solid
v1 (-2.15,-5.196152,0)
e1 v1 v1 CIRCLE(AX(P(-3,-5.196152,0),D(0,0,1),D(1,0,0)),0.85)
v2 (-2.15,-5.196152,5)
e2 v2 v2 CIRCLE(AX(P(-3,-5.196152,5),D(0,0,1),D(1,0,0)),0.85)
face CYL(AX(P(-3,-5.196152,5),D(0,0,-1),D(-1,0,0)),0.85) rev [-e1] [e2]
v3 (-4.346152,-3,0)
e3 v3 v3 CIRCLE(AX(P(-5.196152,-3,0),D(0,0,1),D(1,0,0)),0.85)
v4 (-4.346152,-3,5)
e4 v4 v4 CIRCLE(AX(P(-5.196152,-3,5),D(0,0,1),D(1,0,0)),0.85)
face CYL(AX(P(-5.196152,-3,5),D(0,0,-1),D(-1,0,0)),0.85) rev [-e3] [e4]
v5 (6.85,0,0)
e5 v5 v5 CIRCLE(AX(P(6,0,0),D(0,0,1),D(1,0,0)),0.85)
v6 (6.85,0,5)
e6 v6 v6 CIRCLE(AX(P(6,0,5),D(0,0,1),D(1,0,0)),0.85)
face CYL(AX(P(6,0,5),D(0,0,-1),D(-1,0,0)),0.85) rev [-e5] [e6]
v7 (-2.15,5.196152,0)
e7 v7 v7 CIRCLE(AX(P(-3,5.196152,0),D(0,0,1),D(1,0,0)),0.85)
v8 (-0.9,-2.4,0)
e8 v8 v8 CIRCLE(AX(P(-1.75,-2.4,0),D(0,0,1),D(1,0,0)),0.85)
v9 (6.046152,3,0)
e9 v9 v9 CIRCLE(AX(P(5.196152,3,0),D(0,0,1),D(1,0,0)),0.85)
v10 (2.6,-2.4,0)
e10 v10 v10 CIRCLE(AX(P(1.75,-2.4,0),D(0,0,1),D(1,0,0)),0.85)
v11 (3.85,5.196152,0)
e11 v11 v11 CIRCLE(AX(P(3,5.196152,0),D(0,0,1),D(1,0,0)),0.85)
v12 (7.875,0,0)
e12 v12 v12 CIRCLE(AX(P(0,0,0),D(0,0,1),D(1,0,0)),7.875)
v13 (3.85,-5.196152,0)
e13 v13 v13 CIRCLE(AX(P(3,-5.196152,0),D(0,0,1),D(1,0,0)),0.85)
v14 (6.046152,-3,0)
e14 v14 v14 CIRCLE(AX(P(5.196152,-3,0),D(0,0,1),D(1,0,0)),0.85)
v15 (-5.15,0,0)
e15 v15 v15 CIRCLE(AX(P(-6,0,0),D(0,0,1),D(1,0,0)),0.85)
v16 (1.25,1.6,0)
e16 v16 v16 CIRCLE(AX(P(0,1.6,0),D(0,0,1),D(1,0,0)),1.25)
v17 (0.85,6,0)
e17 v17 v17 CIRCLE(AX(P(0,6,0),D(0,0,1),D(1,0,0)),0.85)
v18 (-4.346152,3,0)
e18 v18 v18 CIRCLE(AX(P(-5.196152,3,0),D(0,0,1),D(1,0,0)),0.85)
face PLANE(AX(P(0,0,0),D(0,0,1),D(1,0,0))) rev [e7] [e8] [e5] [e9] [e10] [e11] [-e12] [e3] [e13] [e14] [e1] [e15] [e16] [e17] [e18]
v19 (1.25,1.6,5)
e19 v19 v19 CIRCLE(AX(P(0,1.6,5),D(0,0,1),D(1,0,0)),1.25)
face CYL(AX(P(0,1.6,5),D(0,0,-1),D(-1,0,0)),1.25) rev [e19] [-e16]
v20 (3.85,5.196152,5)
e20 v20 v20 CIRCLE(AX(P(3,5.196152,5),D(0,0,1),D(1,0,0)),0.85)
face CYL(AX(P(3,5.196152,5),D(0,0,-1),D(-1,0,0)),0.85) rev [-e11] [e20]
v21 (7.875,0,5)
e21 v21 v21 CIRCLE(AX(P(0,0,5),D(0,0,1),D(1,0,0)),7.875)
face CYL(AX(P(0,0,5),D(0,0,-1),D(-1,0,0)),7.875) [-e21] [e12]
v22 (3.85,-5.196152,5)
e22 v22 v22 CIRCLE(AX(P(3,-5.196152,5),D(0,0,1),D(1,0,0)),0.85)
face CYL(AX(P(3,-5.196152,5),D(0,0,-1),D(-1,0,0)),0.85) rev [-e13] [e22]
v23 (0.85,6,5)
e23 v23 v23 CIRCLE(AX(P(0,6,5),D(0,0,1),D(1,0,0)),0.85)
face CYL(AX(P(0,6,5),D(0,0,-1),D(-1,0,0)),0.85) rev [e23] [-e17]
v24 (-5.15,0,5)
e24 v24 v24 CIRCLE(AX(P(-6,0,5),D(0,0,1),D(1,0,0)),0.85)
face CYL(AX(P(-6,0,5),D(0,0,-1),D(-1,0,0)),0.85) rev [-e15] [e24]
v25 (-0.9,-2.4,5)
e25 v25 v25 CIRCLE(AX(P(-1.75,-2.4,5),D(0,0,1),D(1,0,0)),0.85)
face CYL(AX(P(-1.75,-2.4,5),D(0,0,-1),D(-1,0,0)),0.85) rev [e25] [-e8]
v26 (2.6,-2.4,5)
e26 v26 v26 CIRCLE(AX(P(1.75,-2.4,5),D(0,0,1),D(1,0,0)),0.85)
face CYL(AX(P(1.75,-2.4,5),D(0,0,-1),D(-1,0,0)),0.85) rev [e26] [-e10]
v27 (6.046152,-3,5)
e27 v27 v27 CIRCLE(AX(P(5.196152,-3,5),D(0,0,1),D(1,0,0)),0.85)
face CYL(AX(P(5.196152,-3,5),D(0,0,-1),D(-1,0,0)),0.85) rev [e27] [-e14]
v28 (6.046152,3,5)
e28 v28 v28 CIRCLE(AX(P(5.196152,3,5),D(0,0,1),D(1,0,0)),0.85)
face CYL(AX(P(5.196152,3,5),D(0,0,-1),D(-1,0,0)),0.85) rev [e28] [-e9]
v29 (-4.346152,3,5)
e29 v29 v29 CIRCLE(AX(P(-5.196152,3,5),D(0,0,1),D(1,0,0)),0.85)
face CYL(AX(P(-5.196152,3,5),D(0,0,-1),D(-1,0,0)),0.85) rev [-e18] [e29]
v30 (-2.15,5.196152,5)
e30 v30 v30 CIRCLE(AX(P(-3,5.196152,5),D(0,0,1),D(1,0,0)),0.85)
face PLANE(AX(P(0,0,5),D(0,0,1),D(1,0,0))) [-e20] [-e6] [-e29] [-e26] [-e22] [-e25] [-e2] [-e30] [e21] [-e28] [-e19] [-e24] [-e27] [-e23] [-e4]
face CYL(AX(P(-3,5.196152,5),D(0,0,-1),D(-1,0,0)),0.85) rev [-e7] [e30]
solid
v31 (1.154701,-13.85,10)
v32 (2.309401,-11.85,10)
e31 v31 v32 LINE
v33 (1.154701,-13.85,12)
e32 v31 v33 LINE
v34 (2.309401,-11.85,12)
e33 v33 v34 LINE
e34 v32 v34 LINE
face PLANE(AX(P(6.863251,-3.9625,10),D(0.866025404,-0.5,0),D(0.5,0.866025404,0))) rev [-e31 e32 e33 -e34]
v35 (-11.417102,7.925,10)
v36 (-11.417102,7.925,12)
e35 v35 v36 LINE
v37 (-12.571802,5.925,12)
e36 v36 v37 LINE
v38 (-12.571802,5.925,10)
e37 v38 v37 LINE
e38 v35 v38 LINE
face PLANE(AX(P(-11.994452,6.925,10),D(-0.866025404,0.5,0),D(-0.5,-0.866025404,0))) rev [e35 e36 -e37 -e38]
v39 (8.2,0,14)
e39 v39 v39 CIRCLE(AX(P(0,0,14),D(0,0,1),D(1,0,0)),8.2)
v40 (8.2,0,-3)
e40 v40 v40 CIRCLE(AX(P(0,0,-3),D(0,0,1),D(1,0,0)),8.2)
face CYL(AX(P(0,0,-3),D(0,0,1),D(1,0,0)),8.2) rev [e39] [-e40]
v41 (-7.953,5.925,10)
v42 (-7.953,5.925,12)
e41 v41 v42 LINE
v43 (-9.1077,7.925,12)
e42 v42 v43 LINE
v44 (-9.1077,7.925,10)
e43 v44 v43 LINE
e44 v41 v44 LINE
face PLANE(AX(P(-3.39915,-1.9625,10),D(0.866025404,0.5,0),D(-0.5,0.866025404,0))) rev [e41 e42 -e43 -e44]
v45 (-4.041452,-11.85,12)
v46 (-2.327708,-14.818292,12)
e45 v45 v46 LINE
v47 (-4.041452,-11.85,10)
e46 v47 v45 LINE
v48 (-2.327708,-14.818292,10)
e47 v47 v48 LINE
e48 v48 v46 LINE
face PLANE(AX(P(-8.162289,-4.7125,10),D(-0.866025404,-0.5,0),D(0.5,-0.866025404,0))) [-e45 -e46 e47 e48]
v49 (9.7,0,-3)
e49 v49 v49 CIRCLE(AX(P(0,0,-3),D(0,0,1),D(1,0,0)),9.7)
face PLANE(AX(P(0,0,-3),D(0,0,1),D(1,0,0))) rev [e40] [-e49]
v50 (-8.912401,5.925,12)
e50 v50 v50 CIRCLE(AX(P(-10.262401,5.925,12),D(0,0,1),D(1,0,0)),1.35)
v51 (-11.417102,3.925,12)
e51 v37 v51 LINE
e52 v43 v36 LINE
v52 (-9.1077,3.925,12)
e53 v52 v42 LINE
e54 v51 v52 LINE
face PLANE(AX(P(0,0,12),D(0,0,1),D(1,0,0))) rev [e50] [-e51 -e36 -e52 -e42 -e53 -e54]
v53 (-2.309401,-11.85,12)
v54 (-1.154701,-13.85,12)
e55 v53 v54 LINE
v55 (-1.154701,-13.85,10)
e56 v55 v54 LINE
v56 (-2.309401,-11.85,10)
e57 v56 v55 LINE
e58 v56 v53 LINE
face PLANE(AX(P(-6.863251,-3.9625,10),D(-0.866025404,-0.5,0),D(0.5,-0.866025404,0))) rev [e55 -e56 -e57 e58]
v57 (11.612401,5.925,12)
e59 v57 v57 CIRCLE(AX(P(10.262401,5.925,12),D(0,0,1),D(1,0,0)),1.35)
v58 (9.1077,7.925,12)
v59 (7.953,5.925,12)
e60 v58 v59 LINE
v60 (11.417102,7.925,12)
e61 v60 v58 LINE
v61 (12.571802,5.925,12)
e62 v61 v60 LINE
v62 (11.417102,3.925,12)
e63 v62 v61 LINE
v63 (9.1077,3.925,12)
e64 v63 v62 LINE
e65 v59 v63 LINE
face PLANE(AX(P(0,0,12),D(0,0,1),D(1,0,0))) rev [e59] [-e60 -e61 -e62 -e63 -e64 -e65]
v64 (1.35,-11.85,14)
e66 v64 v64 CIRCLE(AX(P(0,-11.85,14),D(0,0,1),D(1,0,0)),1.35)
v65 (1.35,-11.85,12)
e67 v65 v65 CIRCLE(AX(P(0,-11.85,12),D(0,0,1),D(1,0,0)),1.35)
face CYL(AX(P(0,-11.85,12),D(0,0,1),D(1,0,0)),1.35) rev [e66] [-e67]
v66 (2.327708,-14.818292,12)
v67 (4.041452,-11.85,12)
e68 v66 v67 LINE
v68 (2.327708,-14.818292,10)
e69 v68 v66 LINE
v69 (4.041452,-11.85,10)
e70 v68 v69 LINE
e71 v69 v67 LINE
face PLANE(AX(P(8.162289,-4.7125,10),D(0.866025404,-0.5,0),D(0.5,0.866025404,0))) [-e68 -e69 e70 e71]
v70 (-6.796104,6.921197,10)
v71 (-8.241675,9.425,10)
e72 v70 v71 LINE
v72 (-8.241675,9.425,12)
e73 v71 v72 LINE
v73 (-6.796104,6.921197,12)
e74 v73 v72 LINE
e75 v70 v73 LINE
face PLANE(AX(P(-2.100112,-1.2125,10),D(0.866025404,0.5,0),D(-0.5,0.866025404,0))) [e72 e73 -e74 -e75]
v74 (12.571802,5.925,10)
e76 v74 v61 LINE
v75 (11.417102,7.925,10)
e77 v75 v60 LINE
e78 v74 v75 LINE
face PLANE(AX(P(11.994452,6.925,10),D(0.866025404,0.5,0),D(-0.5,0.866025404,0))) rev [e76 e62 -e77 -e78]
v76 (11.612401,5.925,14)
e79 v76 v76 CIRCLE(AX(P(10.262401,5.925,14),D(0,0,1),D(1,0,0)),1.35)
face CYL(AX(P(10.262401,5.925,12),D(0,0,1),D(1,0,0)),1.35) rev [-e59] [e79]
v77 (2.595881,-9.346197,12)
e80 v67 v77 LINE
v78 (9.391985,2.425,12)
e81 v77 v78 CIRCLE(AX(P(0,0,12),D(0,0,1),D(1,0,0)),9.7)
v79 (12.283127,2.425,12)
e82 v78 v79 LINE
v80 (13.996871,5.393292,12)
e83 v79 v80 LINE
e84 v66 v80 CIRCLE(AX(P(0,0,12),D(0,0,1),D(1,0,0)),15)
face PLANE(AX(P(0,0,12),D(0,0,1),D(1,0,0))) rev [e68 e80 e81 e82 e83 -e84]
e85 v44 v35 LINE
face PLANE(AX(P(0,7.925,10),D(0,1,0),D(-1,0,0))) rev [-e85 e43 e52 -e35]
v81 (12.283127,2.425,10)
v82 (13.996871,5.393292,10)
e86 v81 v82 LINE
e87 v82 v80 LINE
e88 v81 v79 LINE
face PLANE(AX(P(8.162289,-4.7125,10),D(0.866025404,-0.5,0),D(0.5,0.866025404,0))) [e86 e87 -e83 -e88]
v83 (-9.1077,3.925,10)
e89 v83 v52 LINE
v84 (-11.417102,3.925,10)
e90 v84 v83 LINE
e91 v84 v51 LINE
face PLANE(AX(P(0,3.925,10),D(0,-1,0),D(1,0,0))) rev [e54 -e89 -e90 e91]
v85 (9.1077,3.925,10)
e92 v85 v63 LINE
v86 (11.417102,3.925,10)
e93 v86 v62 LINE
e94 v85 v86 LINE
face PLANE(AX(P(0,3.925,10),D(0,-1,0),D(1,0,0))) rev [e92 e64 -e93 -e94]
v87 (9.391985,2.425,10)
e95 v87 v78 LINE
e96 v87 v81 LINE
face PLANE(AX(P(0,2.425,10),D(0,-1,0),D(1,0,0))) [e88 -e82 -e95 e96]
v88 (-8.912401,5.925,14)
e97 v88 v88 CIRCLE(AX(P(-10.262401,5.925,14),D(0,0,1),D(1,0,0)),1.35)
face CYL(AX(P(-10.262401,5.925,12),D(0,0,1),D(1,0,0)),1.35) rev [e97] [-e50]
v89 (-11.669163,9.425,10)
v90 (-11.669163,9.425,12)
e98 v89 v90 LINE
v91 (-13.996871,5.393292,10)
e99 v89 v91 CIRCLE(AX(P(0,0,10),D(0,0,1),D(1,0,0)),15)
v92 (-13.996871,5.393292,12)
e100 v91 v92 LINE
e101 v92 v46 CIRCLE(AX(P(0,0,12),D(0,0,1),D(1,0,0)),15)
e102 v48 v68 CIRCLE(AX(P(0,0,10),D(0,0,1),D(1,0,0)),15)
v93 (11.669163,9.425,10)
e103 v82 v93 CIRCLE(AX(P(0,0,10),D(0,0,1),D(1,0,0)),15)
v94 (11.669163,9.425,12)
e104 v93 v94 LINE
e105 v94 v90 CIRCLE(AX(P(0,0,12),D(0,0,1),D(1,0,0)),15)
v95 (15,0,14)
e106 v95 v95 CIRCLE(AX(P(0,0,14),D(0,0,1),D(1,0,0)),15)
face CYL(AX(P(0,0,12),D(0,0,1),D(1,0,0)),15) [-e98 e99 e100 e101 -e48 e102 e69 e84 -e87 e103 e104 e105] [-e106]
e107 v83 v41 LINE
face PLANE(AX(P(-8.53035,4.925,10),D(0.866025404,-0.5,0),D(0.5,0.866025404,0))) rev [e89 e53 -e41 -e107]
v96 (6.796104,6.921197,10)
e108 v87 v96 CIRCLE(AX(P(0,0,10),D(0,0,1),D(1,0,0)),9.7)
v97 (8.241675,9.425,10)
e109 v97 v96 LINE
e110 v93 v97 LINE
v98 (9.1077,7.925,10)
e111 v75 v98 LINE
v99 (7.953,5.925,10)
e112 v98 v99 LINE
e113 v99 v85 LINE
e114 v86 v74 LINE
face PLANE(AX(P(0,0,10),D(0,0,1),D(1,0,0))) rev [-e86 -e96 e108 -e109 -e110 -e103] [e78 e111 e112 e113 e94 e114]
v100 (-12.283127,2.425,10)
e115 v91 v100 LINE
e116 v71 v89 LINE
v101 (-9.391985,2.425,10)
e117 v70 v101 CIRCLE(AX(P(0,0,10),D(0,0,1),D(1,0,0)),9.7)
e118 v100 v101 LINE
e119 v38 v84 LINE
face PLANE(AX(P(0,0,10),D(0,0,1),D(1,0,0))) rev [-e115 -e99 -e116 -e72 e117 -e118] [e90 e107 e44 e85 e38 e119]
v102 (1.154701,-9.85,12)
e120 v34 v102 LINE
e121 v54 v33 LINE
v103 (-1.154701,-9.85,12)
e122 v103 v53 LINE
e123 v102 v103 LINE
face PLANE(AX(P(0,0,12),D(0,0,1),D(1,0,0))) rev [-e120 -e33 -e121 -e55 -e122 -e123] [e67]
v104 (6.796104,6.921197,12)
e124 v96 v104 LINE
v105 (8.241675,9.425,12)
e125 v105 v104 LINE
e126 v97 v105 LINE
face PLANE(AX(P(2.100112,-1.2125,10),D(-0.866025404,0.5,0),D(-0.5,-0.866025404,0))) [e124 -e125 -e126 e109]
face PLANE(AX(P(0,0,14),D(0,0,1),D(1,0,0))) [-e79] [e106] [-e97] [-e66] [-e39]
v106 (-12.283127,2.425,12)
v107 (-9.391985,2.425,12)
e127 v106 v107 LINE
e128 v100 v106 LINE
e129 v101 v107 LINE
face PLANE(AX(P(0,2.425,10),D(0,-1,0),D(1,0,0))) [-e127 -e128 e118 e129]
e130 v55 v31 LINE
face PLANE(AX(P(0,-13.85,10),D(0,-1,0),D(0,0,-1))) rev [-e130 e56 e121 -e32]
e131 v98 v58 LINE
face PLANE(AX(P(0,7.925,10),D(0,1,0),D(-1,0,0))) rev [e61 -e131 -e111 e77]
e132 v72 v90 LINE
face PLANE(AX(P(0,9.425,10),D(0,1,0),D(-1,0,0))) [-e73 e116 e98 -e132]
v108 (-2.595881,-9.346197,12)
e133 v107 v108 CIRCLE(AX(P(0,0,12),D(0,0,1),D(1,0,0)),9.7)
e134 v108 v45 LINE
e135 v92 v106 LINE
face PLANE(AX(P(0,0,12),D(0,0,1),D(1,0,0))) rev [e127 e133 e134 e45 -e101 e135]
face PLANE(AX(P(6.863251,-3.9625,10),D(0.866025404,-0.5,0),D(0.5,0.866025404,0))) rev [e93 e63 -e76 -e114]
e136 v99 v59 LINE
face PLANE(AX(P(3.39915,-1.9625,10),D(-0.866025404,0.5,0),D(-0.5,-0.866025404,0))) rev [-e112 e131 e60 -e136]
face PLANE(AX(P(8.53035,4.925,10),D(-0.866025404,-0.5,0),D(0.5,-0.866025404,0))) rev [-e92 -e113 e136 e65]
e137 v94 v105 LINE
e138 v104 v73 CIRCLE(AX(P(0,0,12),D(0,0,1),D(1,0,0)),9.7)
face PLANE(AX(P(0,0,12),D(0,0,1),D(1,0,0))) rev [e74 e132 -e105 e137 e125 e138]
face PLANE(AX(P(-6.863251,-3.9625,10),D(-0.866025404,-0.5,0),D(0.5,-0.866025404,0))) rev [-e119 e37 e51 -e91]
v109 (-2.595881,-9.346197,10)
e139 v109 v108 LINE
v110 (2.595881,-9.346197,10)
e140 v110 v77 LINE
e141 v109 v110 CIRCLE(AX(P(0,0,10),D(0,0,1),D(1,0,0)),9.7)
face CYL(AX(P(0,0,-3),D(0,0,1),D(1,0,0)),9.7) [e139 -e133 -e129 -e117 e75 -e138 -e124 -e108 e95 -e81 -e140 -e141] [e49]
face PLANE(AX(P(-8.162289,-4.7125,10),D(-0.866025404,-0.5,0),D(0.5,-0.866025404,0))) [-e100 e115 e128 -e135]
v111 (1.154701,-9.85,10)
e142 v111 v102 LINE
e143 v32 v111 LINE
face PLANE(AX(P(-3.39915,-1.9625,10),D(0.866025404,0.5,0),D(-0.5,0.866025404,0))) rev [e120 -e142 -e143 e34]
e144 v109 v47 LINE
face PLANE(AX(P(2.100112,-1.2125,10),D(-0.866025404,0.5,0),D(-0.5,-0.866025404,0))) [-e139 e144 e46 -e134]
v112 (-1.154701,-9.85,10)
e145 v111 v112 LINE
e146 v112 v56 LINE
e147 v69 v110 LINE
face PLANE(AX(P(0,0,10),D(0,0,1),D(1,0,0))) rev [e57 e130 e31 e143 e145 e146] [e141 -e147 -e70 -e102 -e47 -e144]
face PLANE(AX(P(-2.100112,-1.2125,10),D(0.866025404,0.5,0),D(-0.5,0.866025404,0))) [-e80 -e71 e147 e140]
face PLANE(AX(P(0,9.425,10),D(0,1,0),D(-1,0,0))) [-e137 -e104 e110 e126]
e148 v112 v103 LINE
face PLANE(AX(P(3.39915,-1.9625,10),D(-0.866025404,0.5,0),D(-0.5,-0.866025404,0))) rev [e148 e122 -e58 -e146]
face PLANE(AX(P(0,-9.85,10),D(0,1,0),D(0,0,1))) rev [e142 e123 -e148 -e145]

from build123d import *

# Parameters (mm, degrees)
SKETCH1_R                 = 7.875
SKETCH1_R_2               = 0.85
SKETCH1_R_3               = 1.25
BOSS_EXTRUDE1_DEPTH       = 5
EXTRUDE_THIN1_START       = -3
EXTRUDE_THIN1_OUTLINE_R   = 9.7
EXTRUDE_THIN1_OUTLINE_R_2 = 8.2
EXTRUDE_THIN1_DEPTH       = 17
SKETCH4_R                 = 15
SKETCH4_R_2               = 9.7
SKETCH4_R_3               = 1.35
BOSS_EXTRUDE2_DEPTH       = 2
BOSS_EXTRUDE3_START       = -2
BOSS_EXTRUDE3_DEPTH       = 2
CIRPATTERN1_COUNT         = 3
SKETCH4_5_R               = 1.35
CUT_EXTRUDE1_DEPTH        = 2


# Read off the part's stored shape, not the designer's step: Extrude-Thin1
with BuildPart() as part:
    # Sketch1 → Boss-Extrude1 (new body)
    with BuildSketch(Plane.XY):
        Circle(SKETCH1_R)
        with Locations((0, 6)):
            Circle(SKETCH1_R_2, mode=Mode.SUBTRACT)
        with Locations((3, 5.196152423)):
            Circle(SKETCH1_R_2, mode=Mode.SUBTRACT)
        with Locations((5.196152423, 3)):
            Circle(SKETCH1_R_2, mode=Mode.SUBTRACT)
        with Locations((6, 0)):
            Circle(SKETCH1_R_2, mode=Mode.SUBTRACT)
        with Locations((5.196152423, -3)):
            Circle(SKETCH1_R_2, mode=Mode.SUBTRACT)
        with Locations((3, -5.196152423)):
            Circle(SKETCH1_R_2, mode=Mode.SUBTRACT)
        with Locations((-3, -5.196152423)):
            Circle(SKETCH1_R_2, mode=Mode.SUBTRACT)
        with Locations((-5.196152423, -3)):
            Circle(SKETCH1_R_2, mode=Mode.SUBTRACT)
        with Locations((-6, 0)):
            Circle(SKETCH1_R_2, mode=Mode.SUBTRACT)
        with Locations((-5.196152423, 3)):
            Circle(SKETCH1_R_2, mode=Mode.SUBTRACT)
        with Locations((-3, 5.196152423)):
            Circle(SKETCH1_R_2, mode=Mode.SUBTRACT)
        with Locations((1.75, -2.4)):
            Circle(SKETCH1_R_2, mode=Mode.SUBTRACT)
        with Locations((-1.75, -2.4)):
            Circle(SKETCH1_R_2, mode=Mode.SUBTRACT)
        with Locations((0, 1.6)):
            Circle(SKETCH1_R_3, mode=Mode.SUBTRACT)
    extrude(amount=BOSS_EXTRUDE1_DEPTH)


with BuildPart() as body_2:
    # Extrude-Thin1 outline → Extrude-Thin1 (new body)
    with BuildSketch(Plane.XY.offset(EXTRUDE_THIN1_START)):
        Circle(EXTRUDE_THIN1_OUTLINE_R)
        Circle(EXTRUDE_THIN1_OUTLINE_R_2, mode=Mode.SUBTRACT)
    extrude(amount=EXTRUDE_THIN1_DEPTH)

    # Sketch4 → Boss-Extrude2 (add)
    with BuildSketch(Plane.XY.offset(14)):
        Circle(SKETCH4_R)
        Circle(SKETCH4_R_2, mode=Mode.SUBTRACT)
        with Locations((0, -11.85)):
            Circle(SKETCH4_R_3, mode=Mode.SUBTRACT)
    boss_extrude2 = extrude(amount=-BOSS_EXTRUDE2_DEPTH)

    # Sketch4<4> → Boss-Extrude3 (add)
    with BuildSketch(Plane.XY.offset(14).offset(BOSS_EXTRUDE3_START)):
        with BuildLine():
            Line((2.327707719, -14.818291966), (4.041451884, -11.85))
            Line((4.041451884, -11.85), (2.595880703, -9.346197268))
            ThreePointArc((2.595880703, -9.346197268), (0, -9.7), (-2.595880703, -9.346197268))
            Line((-2.595880703, -9.346197268), (-4.041451884, -11.85))
            Line((-4.041451884, -11.85), (-2.327707719, -14.818291966))
            ThreePointArc((-2.327707719, -14.818291966), (0, -15), (2.327707719, -14.818291966))
        make_face()
        Polygon((1.154700538, -9.85), (2.309401077, -11.85), (1.154700538, -13.85), (-1.154700538, -13.85), (-2.309401077, -11.85), (-1.154700538, -9.85), align=None, mode=Mode.SUBTRACT)
    boss_extrude3 = extrude(amount=-BOSS_EXTRUDE3_DEPTH)

    # CirPattern1: Boss-Extrude2, Boss-Extrude3 ×3 about axis
    cirpattern1_axis = Axis((0, 0, 0), (0, 0, 1))
    add([boss_extrude2.rotate(cirpattern1_axis, i * 360 / CIRPATTERN1_COUNT) for i in range(1, CIRPATTERN1_COUNT)])
    add([boss_extrude3.rotate(cirpattern1_axis, i * 360 / CIRPATTERN1_COUNT) for i in range(1, CIRPATTERN1_COUNT)])

    # Sketch4<5> → Cut-Extrude1 (cut)
    with BuildSketch(Plane.XY.offset(14)):
        with Locations((-10.262401035, 5.925)):
            Circle(SKETCH4_5_R)
        with Locations((10.262401035, 5.925)):
            Circle(SKETCH4_5_R)
        with Locations((0, -11.85)):
            Circle(SKETCH4_5_R)
    extrude(amount=-CUT_EXTRUDE1_DEPTH, mode=Mode.SUBTRACT)


solid = Compound([part.part, body_2.part])
